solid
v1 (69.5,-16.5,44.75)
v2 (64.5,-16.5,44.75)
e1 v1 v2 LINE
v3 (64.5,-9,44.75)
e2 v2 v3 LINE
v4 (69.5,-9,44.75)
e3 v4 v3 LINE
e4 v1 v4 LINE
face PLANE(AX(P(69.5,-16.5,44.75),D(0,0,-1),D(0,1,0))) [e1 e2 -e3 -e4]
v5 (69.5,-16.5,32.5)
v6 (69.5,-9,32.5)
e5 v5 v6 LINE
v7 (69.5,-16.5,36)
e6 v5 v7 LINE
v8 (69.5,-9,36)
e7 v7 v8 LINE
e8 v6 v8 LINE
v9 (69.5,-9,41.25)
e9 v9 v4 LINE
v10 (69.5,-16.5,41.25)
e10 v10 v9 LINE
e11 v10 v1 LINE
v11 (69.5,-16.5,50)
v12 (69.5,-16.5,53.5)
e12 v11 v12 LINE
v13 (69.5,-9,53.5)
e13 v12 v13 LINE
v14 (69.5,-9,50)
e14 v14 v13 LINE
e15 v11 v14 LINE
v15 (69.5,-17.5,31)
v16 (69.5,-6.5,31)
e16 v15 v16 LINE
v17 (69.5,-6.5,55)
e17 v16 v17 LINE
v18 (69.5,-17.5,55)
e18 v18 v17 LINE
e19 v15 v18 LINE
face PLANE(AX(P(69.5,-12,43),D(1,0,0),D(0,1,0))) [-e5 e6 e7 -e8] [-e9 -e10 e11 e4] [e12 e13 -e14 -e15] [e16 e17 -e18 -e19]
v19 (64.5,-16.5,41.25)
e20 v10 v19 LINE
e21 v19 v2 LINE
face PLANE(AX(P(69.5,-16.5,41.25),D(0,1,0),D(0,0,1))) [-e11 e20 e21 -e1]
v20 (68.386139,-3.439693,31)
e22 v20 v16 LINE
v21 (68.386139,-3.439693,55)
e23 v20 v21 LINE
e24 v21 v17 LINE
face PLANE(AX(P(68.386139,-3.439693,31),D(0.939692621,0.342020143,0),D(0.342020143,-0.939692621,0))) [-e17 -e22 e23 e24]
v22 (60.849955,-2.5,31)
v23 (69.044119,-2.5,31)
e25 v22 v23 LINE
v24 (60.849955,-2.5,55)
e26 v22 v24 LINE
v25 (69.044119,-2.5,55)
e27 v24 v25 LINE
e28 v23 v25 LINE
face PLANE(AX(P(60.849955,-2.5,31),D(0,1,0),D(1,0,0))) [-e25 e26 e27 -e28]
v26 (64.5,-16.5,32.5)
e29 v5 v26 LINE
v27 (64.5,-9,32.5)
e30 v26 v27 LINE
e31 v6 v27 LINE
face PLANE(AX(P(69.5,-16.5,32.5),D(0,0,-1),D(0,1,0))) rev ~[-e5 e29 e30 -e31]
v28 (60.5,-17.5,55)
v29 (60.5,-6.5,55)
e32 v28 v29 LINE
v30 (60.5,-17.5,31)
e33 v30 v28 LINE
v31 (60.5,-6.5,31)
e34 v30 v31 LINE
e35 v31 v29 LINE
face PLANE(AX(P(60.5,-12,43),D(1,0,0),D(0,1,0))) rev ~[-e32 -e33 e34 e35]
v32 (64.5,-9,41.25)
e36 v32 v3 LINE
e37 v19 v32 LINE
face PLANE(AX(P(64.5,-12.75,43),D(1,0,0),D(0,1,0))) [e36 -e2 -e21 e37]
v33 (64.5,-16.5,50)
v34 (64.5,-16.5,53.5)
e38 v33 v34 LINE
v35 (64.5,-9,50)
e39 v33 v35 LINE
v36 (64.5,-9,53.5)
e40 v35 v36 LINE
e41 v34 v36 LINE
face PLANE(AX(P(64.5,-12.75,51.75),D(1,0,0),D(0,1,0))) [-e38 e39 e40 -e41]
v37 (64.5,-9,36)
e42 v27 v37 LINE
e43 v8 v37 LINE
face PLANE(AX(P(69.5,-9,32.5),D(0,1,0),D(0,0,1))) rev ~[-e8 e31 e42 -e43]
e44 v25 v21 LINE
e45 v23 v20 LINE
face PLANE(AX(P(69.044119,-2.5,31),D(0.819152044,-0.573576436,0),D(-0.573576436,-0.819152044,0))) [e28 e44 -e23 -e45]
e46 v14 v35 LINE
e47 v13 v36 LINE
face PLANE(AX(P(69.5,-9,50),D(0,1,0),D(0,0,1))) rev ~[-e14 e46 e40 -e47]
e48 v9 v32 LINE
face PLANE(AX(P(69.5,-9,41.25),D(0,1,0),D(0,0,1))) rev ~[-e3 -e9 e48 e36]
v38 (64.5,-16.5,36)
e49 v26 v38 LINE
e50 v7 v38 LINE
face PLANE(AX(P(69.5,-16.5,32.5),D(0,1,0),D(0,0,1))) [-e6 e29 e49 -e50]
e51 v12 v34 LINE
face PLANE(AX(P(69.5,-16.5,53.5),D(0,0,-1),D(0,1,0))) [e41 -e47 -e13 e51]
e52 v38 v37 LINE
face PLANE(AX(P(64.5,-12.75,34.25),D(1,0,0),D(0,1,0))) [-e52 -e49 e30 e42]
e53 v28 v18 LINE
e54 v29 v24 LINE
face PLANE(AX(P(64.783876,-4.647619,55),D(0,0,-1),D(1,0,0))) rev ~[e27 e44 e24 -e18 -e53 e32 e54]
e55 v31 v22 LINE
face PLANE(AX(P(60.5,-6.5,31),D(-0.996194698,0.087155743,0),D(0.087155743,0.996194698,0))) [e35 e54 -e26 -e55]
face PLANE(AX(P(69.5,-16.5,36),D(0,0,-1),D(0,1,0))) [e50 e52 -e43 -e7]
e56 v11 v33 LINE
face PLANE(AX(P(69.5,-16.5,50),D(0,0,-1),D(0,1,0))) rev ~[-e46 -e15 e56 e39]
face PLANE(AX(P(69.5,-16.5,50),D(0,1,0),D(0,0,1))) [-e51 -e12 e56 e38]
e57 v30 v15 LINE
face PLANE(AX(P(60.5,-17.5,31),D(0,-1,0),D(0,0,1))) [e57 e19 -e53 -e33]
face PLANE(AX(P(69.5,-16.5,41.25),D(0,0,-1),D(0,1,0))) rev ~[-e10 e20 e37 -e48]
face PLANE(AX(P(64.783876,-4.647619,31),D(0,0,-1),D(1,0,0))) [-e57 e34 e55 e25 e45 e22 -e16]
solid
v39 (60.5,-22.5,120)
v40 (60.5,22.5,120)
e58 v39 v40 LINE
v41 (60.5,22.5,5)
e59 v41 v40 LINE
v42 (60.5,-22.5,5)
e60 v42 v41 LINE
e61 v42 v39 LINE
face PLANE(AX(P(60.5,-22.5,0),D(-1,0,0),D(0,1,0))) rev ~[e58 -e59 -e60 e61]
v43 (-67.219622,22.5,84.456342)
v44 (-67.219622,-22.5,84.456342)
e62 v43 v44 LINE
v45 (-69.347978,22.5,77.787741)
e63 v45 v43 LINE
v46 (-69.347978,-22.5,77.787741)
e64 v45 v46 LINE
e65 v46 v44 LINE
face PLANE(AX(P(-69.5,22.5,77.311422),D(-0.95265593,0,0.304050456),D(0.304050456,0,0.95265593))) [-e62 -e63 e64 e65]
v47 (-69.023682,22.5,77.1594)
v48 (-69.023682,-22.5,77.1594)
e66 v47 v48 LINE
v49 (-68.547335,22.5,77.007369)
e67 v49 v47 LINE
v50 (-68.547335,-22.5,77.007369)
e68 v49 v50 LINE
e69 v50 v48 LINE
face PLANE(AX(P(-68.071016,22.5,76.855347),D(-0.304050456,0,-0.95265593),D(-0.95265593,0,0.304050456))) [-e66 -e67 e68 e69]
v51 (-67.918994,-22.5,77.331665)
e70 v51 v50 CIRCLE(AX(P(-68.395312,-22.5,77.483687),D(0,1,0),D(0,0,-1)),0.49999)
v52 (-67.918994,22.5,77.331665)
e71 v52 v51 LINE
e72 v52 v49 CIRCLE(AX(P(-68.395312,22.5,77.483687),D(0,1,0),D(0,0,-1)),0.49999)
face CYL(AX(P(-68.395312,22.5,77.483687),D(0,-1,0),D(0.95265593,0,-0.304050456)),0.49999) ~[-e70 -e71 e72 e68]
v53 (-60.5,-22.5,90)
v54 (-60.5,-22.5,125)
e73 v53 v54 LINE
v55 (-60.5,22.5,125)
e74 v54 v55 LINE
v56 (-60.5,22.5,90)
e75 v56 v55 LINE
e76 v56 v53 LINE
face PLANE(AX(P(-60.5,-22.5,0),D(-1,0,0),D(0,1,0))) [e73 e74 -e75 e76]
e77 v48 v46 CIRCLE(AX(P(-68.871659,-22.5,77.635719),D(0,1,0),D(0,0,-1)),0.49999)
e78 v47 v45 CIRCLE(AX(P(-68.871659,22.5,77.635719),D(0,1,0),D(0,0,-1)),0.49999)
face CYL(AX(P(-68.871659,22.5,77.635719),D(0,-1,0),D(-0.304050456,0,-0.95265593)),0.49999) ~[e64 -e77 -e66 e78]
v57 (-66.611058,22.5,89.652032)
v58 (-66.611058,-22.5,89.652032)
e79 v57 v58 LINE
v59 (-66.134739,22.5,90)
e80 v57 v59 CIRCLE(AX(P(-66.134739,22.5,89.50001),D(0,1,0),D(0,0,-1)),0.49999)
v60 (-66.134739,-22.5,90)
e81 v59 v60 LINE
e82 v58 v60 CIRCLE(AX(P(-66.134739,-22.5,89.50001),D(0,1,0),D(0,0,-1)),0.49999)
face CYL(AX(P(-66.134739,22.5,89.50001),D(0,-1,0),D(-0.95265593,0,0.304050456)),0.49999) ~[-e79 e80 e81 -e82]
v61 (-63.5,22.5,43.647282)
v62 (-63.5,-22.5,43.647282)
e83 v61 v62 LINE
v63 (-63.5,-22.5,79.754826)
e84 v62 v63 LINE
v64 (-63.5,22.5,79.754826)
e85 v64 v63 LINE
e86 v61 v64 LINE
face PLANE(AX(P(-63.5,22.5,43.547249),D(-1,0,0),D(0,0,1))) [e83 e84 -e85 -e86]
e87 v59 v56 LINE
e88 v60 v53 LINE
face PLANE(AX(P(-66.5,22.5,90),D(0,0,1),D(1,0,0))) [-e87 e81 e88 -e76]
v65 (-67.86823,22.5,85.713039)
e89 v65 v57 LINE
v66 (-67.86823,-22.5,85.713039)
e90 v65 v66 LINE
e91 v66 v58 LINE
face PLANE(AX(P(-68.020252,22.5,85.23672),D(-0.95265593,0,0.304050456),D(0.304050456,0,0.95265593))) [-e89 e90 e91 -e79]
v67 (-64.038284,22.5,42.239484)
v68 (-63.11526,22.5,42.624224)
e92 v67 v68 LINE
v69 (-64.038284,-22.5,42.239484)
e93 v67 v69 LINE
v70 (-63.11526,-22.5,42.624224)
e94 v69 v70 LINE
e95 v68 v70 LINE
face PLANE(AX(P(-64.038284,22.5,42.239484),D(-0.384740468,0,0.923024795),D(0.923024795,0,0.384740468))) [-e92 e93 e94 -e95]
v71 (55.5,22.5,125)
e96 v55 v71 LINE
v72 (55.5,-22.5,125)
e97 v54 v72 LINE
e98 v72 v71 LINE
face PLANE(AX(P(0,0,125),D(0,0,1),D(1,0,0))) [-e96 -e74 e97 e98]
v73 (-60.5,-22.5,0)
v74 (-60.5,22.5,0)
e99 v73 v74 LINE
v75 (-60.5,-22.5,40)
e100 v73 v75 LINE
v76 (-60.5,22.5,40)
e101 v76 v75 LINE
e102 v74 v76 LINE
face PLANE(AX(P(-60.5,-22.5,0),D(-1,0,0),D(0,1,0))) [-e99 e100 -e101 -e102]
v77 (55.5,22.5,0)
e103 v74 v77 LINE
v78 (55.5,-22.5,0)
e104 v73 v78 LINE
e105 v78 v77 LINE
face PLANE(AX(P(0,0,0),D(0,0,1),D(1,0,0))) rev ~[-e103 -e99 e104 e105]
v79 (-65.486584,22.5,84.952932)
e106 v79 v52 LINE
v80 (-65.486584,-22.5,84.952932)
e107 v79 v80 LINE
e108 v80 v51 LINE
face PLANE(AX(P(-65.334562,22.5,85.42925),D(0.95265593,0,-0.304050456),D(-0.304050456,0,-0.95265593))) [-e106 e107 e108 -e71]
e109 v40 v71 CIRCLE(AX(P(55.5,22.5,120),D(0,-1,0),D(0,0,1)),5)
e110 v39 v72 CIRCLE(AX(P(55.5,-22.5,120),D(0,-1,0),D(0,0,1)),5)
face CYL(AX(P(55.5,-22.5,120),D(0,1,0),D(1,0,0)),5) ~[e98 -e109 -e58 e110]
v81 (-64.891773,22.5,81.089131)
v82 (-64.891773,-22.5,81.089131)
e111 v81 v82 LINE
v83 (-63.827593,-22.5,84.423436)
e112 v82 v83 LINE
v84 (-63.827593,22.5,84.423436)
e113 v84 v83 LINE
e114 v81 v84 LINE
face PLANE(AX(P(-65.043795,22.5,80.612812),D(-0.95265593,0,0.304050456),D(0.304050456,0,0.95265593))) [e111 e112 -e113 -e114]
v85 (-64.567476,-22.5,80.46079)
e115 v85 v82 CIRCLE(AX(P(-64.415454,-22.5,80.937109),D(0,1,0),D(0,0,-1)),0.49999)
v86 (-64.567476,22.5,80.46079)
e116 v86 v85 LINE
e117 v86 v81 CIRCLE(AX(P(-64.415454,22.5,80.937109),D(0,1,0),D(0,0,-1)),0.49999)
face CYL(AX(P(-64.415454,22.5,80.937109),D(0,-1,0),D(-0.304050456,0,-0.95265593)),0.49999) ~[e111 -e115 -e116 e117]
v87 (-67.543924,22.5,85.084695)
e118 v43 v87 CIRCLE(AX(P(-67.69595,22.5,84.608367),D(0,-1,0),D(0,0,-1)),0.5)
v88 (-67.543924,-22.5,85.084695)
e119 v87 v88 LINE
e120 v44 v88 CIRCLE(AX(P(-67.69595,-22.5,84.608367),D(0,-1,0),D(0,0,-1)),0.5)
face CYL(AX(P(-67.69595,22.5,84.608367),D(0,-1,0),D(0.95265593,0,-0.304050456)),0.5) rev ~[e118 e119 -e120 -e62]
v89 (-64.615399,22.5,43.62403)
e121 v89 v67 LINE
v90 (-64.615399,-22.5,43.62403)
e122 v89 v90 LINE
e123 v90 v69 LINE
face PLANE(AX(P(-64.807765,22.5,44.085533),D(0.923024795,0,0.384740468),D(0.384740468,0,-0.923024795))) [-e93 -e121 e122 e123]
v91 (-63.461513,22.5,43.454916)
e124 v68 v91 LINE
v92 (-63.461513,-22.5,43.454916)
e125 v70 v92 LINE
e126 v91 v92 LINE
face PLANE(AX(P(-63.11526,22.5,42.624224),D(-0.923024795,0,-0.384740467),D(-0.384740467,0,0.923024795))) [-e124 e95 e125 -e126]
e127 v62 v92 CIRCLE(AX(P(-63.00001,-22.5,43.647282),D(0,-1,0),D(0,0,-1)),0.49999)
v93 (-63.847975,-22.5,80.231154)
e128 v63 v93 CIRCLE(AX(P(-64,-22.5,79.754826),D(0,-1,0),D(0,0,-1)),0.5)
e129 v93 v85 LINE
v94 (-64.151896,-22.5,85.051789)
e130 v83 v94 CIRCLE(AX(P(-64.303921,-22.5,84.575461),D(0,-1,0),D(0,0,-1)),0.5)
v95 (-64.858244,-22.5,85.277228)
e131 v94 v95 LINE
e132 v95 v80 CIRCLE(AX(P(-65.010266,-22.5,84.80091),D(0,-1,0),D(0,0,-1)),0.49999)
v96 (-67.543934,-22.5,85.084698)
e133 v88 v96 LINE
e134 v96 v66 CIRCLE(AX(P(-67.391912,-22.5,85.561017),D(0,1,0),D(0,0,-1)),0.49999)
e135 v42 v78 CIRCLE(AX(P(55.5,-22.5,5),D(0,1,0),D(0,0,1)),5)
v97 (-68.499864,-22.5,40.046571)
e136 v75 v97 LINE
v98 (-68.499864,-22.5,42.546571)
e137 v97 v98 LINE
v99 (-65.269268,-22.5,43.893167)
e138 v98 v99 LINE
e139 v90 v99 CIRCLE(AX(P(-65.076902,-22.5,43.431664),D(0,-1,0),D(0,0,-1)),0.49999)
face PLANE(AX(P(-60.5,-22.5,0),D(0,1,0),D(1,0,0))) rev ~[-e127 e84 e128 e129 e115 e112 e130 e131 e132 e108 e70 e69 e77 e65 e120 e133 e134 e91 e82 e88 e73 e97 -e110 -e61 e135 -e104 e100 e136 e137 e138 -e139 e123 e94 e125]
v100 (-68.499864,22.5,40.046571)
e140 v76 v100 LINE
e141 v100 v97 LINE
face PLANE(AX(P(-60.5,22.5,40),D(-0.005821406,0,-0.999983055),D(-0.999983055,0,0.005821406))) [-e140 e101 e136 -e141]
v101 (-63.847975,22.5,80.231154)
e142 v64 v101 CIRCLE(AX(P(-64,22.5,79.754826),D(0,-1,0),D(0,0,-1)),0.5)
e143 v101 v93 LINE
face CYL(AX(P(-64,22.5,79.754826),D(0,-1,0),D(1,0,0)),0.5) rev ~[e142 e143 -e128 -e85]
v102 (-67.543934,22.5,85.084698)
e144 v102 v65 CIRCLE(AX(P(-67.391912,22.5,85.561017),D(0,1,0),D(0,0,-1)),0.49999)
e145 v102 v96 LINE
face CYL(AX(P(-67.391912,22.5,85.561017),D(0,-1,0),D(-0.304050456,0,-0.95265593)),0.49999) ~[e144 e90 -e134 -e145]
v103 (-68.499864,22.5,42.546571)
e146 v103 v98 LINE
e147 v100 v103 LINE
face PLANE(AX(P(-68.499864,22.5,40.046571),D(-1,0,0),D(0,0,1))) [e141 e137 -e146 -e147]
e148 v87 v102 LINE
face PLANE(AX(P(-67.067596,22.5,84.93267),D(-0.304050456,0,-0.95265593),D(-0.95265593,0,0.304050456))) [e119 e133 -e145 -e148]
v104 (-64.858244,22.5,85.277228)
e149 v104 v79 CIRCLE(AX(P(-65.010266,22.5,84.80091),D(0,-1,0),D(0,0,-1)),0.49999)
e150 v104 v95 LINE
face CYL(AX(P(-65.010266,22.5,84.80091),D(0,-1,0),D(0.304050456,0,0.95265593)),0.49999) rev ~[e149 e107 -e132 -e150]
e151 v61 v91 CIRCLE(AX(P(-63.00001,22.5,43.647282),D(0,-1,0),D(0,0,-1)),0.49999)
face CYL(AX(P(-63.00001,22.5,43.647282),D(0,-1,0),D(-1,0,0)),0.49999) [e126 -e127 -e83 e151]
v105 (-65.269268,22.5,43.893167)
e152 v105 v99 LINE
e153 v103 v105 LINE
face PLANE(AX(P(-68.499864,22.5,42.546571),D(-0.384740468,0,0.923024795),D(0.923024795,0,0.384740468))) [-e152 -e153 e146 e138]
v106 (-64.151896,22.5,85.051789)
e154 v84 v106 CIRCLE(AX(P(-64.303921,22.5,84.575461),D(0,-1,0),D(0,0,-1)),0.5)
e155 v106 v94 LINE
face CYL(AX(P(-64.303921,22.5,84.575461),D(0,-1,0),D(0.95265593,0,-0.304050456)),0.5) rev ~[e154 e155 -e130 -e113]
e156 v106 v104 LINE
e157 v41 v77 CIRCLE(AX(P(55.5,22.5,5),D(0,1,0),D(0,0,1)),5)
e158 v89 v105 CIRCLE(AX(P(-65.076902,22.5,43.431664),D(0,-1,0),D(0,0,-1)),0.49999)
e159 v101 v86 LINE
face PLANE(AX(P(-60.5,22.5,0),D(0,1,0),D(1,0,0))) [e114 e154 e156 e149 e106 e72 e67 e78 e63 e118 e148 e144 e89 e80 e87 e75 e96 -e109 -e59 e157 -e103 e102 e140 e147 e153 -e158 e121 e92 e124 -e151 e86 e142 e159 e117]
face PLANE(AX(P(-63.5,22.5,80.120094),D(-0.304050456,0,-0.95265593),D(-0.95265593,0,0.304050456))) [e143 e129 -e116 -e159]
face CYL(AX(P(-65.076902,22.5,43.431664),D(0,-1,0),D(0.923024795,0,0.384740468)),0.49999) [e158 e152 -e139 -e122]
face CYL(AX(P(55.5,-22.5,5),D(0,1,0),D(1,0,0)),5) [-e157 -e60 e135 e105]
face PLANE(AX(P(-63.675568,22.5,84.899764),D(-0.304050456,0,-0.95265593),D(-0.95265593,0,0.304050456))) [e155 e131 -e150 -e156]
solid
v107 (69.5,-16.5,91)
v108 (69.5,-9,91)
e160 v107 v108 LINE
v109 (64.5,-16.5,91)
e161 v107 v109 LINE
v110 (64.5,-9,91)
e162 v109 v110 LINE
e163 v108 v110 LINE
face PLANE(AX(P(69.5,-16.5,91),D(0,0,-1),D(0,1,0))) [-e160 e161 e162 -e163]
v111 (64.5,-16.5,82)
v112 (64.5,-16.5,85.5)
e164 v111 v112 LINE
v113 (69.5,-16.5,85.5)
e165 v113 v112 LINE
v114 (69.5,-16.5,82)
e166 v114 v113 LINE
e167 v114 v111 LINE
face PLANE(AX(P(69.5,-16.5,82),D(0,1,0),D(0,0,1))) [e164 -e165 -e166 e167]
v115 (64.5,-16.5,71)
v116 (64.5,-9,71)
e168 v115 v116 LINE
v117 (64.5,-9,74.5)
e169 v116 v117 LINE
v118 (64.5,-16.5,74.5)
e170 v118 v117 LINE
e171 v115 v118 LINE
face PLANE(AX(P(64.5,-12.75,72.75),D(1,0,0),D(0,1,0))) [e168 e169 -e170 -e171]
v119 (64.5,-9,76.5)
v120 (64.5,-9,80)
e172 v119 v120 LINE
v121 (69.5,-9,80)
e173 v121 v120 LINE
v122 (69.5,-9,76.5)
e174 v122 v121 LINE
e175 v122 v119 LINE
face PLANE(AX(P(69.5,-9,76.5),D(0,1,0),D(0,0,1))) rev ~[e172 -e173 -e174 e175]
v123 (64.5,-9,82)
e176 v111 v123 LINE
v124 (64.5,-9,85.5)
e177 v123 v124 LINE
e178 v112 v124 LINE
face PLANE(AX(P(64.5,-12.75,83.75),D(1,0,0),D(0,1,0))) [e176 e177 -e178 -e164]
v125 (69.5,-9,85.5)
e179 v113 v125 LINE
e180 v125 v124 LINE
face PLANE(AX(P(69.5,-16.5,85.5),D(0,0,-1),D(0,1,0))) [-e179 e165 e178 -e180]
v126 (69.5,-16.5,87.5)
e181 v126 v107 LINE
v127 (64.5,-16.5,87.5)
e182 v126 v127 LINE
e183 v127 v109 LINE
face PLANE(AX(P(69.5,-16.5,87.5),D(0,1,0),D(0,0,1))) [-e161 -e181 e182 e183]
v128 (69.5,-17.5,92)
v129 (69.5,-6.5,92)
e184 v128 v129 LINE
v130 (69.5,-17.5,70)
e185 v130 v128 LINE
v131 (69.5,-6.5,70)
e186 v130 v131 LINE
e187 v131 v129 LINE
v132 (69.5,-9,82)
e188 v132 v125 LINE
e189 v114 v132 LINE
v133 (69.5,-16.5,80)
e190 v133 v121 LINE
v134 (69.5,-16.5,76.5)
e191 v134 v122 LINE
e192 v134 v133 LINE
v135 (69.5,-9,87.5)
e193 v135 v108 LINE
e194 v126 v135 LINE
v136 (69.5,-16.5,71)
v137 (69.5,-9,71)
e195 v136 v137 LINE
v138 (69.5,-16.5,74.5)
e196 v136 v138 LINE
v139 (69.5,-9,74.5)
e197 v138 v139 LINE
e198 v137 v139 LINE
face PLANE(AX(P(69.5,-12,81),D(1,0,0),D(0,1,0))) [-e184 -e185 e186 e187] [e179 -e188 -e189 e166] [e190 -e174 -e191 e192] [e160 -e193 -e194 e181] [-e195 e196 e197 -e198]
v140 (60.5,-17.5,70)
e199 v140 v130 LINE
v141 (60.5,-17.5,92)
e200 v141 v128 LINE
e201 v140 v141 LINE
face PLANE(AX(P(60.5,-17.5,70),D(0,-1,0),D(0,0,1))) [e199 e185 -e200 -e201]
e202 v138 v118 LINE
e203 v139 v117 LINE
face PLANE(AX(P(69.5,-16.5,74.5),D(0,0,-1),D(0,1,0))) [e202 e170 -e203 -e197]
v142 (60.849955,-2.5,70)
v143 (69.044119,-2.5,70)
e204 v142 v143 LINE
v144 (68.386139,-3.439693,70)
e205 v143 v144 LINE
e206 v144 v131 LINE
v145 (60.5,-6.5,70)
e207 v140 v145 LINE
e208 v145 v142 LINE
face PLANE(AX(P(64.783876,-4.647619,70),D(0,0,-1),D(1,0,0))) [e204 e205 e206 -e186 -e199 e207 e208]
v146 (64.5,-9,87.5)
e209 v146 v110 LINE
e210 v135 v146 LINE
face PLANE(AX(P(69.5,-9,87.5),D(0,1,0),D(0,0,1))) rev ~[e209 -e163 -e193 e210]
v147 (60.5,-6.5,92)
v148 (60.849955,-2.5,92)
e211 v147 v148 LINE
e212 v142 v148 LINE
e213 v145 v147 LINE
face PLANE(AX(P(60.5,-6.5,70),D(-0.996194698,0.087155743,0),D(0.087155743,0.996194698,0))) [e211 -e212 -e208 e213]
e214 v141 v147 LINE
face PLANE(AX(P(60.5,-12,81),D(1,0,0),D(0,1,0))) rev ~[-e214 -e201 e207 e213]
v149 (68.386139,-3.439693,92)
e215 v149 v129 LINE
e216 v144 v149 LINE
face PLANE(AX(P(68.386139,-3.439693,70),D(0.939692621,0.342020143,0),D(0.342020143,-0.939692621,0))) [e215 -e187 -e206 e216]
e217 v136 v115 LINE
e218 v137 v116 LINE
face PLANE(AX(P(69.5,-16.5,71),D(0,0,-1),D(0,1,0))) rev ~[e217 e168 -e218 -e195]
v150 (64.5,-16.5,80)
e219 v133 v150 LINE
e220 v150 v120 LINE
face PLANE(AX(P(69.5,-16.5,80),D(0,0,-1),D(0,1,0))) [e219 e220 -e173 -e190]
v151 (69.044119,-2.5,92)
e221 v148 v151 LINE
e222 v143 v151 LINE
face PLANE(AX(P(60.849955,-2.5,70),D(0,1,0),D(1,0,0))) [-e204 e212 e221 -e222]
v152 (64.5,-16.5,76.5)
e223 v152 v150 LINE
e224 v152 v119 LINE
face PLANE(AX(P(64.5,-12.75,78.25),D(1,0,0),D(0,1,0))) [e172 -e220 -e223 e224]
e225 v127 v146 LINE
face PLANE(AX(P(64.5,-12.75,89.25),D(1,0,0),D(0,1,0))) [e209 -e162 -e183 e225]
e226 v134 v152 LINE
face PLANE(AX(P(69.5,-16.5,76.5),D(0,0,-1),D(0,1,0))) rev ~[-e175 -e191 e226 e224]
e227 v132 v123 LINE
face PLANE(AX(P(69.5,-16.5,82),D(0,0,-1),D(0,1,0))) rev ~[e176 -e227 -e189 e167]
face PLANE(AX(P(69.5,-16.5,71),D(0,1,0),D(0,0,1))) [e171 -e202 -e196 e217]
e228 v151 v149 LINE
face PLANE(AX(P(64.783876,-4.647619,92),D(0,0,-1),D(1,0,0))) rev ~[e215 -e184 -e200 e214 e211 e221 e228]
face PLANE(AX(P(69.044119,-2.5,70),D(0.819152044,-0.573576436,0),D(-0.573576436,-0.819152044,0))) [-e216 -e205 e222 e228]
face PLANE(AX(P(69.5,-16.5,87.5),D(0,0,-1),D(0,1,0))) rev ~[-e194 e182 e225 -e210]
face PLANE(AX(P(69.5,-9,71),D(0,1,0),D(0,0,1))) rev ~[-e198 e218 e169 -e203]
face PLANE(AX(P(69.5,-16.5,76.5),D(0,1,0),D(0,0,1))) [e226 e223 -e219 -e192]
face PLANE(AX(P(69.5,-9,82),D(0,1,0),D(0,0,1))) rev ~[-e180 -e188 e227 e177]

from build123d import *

# Parameters (mm, degrees)
F0_W      = 121
F0_H      = 45
F1_DEPTH  = 125
F2_R      = 5
F3_W      = 11
F3_H      = 22
F4_DEPTH  = 9
F3_H_2    = 24
F6_DEPTH  = 22
F8_DEPTH  = 24
F9_W      = 7.5
F9_H      = 3.5
F10_DEPTH = 5
F11_DEPTH = 5
F13_DEPTH = 45
F14_R     = 0.5
F15_R     = 0.49999


# Not quite as in the source:
# - a fillet or chamfer is up to 0.001 mm smaller than in the source, because OpenCascade refuses the exact size
# - a feature names something its author has since deleted; it is built from what else it names


with BuildPart() as f1:
    # F0 (on Top) → F1 (new body)
    with BuildSketch(Plane.XY):
        Rectangle(F0_W, F0_H)
    extrude(amount=F1_DEPTH)

    # F2
    f2_edges = [f1.edges().sort_by_distance(p)[0] for p in [
        (60.5, 0, 125),
        (60.5, 0, 0),
    ]]
    fillet(f2_edges, radius=F2_R)

    # F12 (on face) → F13 (join, through all)
    with BuildSketch(Plane(origin=(0, 22.5, 0), x_dir=(-1, 0, 0), z_dir=(0, 1, 0))):
        Polygon((60.5, 90), (60.5, 40), (68.4998644438, 40.0465712465), (68.4998644438, 42.5465712465), (64.8077652628, 44.0855331166), (64.0382843277, 42.2394835261), (63.1152595325, 42.6242239936), (63.5, 43.5472487889), (63.5, 80.1200936495), (65.0437947471, 80.6128124606), (63.6755676946, 84.8997641436), (65.3345620006, 85.4292501414), (68.0710161057, 76.8553467754), (69.5, 77.3114224596), (67.067596351, 84.9326698961), (68.0202522806, 85.2367203522), (66.5, 90), align=None)
    extrude(amount=-F13_DEPTH)

    # F14
    f14_edges = [f1.edges().sort_by_distance(p)[0] for p in [
        (-67.067596, 0, 84.93267),
        (-63.675568, 0, 84.899764),
        (-63.5, 0, 80.120094),
    ]]
    fillet(f14_edges, radius=F14_R)

    # F15 (radius 0.5 in the source; OpenCascade refuses exactly that, so slightly less here)
    f15_edges = [f1.edges().sort_by_distance(p)[0] for p in [
        (-68.020252, 0, 85.23672),
        (-69.5, 0, 77.311422),
        (-68.071016, 0, 76.855347),
        (-65.334562, 0, 85.42925),
        (-66.5, 0, 90),
        (-65.043795, 0, 80.612812),
        (-64.807765, 0, 44.085533),
        (-63.5, 0, 43.547249),
    ]]
    fillet(f15_edges, radius=F15_R)


with BuildPart() as f4:
    # F3 (on face) → F4 (new body)
    with BuildSketch(Plane.YZ.offset(60.5)):
        with Locations((-12, 81)):
            Rectangle(F3_W, F3_H)
    extrude(amount=F4_DEPTH)

    # F5 (on face) → F6 (join, through all)
    with BuildSketch(Plane(origin=(0, 0, 70), x_dir=(1, 0, 0), z_dir=(0, 0, -1))):
        Polygon((68.3861392063, 3.4396926208), (69.5, 6.5), (60.5, 6.5), (60.8499546541, 2.5), (68.0441190629, 2.5), align=None)
        Polygon((69.0441190629, 2.5), (68.3861392063, 3.4396926208), (68.0441190629, 2.5), align=None)
    extrude(amount=-F6_DEPTH)

    # F9 (on face) → F11 (cut)
    with BuildSketch(Plane.YZ.offset(69.5)):
        with Locations((-12.75, 72.75)):
            Rectangle(F9_W, F9_H)
        with Locations((-12.75, 78.25)):
            Rectangle(F9_W, F9_H)
        with Locations((-12.75, 83.75)):
            Rectangle(F9_W, F9_H)
        with Locations((-12.75, 89.25)):
            Rectangle(F9_W, F9_H)
    extrude(amount=-F11_DEPTH, mode=Mode.SUBTRACT)


with BuildPart() as f4b:
    # F3 (on face) → F4, piece 2 (new body)
    with BuildSketch(Plane.YZ.offset(60.5)):
        with Locations((-12, 43)):
            Rectangle(F3_W, F3_H_2)
    extrude(amount=F4_DEPTH)

    # F7 (on face) → F8 (join, through all)
    with BuildSketch(Plane(origin=(0, 0, 31), x_dir=(1, 0, 0), z_dir=(0, 0, -1))):
        Polygon((68.3861392063, 3.4396926208), (69.5, 6.5), (60.5, 6.5), (60.8499546541, 2.5), (68.0441190629, 2.5), align=None)
        Polygon((69.0441190629, 2.5), (68.3861392063, 3.4396926208), (68.0441190629, 2.5), align=None)
    extrude(amount=-F8_DEPTH)

    # F9 (on face) → F10 (cut)
    with BuildSketch(Plane.YZ.offset(69.5)):
        with Locations((-12.75, 34.25)):
            Rectangle(F9_W, F9_H)
        with Locations((-12.75, 43)):
            Rectangle(F9_W, F9_H)
        with Locations((-12.75, 51.75)):
            Rectangle(F9_W, F9_H)
    extrude(amount=-F10_DEPTH, mode=Mode.SUBTRACT)


solid = Compound([f1.part, f4.part, f4b.part])
